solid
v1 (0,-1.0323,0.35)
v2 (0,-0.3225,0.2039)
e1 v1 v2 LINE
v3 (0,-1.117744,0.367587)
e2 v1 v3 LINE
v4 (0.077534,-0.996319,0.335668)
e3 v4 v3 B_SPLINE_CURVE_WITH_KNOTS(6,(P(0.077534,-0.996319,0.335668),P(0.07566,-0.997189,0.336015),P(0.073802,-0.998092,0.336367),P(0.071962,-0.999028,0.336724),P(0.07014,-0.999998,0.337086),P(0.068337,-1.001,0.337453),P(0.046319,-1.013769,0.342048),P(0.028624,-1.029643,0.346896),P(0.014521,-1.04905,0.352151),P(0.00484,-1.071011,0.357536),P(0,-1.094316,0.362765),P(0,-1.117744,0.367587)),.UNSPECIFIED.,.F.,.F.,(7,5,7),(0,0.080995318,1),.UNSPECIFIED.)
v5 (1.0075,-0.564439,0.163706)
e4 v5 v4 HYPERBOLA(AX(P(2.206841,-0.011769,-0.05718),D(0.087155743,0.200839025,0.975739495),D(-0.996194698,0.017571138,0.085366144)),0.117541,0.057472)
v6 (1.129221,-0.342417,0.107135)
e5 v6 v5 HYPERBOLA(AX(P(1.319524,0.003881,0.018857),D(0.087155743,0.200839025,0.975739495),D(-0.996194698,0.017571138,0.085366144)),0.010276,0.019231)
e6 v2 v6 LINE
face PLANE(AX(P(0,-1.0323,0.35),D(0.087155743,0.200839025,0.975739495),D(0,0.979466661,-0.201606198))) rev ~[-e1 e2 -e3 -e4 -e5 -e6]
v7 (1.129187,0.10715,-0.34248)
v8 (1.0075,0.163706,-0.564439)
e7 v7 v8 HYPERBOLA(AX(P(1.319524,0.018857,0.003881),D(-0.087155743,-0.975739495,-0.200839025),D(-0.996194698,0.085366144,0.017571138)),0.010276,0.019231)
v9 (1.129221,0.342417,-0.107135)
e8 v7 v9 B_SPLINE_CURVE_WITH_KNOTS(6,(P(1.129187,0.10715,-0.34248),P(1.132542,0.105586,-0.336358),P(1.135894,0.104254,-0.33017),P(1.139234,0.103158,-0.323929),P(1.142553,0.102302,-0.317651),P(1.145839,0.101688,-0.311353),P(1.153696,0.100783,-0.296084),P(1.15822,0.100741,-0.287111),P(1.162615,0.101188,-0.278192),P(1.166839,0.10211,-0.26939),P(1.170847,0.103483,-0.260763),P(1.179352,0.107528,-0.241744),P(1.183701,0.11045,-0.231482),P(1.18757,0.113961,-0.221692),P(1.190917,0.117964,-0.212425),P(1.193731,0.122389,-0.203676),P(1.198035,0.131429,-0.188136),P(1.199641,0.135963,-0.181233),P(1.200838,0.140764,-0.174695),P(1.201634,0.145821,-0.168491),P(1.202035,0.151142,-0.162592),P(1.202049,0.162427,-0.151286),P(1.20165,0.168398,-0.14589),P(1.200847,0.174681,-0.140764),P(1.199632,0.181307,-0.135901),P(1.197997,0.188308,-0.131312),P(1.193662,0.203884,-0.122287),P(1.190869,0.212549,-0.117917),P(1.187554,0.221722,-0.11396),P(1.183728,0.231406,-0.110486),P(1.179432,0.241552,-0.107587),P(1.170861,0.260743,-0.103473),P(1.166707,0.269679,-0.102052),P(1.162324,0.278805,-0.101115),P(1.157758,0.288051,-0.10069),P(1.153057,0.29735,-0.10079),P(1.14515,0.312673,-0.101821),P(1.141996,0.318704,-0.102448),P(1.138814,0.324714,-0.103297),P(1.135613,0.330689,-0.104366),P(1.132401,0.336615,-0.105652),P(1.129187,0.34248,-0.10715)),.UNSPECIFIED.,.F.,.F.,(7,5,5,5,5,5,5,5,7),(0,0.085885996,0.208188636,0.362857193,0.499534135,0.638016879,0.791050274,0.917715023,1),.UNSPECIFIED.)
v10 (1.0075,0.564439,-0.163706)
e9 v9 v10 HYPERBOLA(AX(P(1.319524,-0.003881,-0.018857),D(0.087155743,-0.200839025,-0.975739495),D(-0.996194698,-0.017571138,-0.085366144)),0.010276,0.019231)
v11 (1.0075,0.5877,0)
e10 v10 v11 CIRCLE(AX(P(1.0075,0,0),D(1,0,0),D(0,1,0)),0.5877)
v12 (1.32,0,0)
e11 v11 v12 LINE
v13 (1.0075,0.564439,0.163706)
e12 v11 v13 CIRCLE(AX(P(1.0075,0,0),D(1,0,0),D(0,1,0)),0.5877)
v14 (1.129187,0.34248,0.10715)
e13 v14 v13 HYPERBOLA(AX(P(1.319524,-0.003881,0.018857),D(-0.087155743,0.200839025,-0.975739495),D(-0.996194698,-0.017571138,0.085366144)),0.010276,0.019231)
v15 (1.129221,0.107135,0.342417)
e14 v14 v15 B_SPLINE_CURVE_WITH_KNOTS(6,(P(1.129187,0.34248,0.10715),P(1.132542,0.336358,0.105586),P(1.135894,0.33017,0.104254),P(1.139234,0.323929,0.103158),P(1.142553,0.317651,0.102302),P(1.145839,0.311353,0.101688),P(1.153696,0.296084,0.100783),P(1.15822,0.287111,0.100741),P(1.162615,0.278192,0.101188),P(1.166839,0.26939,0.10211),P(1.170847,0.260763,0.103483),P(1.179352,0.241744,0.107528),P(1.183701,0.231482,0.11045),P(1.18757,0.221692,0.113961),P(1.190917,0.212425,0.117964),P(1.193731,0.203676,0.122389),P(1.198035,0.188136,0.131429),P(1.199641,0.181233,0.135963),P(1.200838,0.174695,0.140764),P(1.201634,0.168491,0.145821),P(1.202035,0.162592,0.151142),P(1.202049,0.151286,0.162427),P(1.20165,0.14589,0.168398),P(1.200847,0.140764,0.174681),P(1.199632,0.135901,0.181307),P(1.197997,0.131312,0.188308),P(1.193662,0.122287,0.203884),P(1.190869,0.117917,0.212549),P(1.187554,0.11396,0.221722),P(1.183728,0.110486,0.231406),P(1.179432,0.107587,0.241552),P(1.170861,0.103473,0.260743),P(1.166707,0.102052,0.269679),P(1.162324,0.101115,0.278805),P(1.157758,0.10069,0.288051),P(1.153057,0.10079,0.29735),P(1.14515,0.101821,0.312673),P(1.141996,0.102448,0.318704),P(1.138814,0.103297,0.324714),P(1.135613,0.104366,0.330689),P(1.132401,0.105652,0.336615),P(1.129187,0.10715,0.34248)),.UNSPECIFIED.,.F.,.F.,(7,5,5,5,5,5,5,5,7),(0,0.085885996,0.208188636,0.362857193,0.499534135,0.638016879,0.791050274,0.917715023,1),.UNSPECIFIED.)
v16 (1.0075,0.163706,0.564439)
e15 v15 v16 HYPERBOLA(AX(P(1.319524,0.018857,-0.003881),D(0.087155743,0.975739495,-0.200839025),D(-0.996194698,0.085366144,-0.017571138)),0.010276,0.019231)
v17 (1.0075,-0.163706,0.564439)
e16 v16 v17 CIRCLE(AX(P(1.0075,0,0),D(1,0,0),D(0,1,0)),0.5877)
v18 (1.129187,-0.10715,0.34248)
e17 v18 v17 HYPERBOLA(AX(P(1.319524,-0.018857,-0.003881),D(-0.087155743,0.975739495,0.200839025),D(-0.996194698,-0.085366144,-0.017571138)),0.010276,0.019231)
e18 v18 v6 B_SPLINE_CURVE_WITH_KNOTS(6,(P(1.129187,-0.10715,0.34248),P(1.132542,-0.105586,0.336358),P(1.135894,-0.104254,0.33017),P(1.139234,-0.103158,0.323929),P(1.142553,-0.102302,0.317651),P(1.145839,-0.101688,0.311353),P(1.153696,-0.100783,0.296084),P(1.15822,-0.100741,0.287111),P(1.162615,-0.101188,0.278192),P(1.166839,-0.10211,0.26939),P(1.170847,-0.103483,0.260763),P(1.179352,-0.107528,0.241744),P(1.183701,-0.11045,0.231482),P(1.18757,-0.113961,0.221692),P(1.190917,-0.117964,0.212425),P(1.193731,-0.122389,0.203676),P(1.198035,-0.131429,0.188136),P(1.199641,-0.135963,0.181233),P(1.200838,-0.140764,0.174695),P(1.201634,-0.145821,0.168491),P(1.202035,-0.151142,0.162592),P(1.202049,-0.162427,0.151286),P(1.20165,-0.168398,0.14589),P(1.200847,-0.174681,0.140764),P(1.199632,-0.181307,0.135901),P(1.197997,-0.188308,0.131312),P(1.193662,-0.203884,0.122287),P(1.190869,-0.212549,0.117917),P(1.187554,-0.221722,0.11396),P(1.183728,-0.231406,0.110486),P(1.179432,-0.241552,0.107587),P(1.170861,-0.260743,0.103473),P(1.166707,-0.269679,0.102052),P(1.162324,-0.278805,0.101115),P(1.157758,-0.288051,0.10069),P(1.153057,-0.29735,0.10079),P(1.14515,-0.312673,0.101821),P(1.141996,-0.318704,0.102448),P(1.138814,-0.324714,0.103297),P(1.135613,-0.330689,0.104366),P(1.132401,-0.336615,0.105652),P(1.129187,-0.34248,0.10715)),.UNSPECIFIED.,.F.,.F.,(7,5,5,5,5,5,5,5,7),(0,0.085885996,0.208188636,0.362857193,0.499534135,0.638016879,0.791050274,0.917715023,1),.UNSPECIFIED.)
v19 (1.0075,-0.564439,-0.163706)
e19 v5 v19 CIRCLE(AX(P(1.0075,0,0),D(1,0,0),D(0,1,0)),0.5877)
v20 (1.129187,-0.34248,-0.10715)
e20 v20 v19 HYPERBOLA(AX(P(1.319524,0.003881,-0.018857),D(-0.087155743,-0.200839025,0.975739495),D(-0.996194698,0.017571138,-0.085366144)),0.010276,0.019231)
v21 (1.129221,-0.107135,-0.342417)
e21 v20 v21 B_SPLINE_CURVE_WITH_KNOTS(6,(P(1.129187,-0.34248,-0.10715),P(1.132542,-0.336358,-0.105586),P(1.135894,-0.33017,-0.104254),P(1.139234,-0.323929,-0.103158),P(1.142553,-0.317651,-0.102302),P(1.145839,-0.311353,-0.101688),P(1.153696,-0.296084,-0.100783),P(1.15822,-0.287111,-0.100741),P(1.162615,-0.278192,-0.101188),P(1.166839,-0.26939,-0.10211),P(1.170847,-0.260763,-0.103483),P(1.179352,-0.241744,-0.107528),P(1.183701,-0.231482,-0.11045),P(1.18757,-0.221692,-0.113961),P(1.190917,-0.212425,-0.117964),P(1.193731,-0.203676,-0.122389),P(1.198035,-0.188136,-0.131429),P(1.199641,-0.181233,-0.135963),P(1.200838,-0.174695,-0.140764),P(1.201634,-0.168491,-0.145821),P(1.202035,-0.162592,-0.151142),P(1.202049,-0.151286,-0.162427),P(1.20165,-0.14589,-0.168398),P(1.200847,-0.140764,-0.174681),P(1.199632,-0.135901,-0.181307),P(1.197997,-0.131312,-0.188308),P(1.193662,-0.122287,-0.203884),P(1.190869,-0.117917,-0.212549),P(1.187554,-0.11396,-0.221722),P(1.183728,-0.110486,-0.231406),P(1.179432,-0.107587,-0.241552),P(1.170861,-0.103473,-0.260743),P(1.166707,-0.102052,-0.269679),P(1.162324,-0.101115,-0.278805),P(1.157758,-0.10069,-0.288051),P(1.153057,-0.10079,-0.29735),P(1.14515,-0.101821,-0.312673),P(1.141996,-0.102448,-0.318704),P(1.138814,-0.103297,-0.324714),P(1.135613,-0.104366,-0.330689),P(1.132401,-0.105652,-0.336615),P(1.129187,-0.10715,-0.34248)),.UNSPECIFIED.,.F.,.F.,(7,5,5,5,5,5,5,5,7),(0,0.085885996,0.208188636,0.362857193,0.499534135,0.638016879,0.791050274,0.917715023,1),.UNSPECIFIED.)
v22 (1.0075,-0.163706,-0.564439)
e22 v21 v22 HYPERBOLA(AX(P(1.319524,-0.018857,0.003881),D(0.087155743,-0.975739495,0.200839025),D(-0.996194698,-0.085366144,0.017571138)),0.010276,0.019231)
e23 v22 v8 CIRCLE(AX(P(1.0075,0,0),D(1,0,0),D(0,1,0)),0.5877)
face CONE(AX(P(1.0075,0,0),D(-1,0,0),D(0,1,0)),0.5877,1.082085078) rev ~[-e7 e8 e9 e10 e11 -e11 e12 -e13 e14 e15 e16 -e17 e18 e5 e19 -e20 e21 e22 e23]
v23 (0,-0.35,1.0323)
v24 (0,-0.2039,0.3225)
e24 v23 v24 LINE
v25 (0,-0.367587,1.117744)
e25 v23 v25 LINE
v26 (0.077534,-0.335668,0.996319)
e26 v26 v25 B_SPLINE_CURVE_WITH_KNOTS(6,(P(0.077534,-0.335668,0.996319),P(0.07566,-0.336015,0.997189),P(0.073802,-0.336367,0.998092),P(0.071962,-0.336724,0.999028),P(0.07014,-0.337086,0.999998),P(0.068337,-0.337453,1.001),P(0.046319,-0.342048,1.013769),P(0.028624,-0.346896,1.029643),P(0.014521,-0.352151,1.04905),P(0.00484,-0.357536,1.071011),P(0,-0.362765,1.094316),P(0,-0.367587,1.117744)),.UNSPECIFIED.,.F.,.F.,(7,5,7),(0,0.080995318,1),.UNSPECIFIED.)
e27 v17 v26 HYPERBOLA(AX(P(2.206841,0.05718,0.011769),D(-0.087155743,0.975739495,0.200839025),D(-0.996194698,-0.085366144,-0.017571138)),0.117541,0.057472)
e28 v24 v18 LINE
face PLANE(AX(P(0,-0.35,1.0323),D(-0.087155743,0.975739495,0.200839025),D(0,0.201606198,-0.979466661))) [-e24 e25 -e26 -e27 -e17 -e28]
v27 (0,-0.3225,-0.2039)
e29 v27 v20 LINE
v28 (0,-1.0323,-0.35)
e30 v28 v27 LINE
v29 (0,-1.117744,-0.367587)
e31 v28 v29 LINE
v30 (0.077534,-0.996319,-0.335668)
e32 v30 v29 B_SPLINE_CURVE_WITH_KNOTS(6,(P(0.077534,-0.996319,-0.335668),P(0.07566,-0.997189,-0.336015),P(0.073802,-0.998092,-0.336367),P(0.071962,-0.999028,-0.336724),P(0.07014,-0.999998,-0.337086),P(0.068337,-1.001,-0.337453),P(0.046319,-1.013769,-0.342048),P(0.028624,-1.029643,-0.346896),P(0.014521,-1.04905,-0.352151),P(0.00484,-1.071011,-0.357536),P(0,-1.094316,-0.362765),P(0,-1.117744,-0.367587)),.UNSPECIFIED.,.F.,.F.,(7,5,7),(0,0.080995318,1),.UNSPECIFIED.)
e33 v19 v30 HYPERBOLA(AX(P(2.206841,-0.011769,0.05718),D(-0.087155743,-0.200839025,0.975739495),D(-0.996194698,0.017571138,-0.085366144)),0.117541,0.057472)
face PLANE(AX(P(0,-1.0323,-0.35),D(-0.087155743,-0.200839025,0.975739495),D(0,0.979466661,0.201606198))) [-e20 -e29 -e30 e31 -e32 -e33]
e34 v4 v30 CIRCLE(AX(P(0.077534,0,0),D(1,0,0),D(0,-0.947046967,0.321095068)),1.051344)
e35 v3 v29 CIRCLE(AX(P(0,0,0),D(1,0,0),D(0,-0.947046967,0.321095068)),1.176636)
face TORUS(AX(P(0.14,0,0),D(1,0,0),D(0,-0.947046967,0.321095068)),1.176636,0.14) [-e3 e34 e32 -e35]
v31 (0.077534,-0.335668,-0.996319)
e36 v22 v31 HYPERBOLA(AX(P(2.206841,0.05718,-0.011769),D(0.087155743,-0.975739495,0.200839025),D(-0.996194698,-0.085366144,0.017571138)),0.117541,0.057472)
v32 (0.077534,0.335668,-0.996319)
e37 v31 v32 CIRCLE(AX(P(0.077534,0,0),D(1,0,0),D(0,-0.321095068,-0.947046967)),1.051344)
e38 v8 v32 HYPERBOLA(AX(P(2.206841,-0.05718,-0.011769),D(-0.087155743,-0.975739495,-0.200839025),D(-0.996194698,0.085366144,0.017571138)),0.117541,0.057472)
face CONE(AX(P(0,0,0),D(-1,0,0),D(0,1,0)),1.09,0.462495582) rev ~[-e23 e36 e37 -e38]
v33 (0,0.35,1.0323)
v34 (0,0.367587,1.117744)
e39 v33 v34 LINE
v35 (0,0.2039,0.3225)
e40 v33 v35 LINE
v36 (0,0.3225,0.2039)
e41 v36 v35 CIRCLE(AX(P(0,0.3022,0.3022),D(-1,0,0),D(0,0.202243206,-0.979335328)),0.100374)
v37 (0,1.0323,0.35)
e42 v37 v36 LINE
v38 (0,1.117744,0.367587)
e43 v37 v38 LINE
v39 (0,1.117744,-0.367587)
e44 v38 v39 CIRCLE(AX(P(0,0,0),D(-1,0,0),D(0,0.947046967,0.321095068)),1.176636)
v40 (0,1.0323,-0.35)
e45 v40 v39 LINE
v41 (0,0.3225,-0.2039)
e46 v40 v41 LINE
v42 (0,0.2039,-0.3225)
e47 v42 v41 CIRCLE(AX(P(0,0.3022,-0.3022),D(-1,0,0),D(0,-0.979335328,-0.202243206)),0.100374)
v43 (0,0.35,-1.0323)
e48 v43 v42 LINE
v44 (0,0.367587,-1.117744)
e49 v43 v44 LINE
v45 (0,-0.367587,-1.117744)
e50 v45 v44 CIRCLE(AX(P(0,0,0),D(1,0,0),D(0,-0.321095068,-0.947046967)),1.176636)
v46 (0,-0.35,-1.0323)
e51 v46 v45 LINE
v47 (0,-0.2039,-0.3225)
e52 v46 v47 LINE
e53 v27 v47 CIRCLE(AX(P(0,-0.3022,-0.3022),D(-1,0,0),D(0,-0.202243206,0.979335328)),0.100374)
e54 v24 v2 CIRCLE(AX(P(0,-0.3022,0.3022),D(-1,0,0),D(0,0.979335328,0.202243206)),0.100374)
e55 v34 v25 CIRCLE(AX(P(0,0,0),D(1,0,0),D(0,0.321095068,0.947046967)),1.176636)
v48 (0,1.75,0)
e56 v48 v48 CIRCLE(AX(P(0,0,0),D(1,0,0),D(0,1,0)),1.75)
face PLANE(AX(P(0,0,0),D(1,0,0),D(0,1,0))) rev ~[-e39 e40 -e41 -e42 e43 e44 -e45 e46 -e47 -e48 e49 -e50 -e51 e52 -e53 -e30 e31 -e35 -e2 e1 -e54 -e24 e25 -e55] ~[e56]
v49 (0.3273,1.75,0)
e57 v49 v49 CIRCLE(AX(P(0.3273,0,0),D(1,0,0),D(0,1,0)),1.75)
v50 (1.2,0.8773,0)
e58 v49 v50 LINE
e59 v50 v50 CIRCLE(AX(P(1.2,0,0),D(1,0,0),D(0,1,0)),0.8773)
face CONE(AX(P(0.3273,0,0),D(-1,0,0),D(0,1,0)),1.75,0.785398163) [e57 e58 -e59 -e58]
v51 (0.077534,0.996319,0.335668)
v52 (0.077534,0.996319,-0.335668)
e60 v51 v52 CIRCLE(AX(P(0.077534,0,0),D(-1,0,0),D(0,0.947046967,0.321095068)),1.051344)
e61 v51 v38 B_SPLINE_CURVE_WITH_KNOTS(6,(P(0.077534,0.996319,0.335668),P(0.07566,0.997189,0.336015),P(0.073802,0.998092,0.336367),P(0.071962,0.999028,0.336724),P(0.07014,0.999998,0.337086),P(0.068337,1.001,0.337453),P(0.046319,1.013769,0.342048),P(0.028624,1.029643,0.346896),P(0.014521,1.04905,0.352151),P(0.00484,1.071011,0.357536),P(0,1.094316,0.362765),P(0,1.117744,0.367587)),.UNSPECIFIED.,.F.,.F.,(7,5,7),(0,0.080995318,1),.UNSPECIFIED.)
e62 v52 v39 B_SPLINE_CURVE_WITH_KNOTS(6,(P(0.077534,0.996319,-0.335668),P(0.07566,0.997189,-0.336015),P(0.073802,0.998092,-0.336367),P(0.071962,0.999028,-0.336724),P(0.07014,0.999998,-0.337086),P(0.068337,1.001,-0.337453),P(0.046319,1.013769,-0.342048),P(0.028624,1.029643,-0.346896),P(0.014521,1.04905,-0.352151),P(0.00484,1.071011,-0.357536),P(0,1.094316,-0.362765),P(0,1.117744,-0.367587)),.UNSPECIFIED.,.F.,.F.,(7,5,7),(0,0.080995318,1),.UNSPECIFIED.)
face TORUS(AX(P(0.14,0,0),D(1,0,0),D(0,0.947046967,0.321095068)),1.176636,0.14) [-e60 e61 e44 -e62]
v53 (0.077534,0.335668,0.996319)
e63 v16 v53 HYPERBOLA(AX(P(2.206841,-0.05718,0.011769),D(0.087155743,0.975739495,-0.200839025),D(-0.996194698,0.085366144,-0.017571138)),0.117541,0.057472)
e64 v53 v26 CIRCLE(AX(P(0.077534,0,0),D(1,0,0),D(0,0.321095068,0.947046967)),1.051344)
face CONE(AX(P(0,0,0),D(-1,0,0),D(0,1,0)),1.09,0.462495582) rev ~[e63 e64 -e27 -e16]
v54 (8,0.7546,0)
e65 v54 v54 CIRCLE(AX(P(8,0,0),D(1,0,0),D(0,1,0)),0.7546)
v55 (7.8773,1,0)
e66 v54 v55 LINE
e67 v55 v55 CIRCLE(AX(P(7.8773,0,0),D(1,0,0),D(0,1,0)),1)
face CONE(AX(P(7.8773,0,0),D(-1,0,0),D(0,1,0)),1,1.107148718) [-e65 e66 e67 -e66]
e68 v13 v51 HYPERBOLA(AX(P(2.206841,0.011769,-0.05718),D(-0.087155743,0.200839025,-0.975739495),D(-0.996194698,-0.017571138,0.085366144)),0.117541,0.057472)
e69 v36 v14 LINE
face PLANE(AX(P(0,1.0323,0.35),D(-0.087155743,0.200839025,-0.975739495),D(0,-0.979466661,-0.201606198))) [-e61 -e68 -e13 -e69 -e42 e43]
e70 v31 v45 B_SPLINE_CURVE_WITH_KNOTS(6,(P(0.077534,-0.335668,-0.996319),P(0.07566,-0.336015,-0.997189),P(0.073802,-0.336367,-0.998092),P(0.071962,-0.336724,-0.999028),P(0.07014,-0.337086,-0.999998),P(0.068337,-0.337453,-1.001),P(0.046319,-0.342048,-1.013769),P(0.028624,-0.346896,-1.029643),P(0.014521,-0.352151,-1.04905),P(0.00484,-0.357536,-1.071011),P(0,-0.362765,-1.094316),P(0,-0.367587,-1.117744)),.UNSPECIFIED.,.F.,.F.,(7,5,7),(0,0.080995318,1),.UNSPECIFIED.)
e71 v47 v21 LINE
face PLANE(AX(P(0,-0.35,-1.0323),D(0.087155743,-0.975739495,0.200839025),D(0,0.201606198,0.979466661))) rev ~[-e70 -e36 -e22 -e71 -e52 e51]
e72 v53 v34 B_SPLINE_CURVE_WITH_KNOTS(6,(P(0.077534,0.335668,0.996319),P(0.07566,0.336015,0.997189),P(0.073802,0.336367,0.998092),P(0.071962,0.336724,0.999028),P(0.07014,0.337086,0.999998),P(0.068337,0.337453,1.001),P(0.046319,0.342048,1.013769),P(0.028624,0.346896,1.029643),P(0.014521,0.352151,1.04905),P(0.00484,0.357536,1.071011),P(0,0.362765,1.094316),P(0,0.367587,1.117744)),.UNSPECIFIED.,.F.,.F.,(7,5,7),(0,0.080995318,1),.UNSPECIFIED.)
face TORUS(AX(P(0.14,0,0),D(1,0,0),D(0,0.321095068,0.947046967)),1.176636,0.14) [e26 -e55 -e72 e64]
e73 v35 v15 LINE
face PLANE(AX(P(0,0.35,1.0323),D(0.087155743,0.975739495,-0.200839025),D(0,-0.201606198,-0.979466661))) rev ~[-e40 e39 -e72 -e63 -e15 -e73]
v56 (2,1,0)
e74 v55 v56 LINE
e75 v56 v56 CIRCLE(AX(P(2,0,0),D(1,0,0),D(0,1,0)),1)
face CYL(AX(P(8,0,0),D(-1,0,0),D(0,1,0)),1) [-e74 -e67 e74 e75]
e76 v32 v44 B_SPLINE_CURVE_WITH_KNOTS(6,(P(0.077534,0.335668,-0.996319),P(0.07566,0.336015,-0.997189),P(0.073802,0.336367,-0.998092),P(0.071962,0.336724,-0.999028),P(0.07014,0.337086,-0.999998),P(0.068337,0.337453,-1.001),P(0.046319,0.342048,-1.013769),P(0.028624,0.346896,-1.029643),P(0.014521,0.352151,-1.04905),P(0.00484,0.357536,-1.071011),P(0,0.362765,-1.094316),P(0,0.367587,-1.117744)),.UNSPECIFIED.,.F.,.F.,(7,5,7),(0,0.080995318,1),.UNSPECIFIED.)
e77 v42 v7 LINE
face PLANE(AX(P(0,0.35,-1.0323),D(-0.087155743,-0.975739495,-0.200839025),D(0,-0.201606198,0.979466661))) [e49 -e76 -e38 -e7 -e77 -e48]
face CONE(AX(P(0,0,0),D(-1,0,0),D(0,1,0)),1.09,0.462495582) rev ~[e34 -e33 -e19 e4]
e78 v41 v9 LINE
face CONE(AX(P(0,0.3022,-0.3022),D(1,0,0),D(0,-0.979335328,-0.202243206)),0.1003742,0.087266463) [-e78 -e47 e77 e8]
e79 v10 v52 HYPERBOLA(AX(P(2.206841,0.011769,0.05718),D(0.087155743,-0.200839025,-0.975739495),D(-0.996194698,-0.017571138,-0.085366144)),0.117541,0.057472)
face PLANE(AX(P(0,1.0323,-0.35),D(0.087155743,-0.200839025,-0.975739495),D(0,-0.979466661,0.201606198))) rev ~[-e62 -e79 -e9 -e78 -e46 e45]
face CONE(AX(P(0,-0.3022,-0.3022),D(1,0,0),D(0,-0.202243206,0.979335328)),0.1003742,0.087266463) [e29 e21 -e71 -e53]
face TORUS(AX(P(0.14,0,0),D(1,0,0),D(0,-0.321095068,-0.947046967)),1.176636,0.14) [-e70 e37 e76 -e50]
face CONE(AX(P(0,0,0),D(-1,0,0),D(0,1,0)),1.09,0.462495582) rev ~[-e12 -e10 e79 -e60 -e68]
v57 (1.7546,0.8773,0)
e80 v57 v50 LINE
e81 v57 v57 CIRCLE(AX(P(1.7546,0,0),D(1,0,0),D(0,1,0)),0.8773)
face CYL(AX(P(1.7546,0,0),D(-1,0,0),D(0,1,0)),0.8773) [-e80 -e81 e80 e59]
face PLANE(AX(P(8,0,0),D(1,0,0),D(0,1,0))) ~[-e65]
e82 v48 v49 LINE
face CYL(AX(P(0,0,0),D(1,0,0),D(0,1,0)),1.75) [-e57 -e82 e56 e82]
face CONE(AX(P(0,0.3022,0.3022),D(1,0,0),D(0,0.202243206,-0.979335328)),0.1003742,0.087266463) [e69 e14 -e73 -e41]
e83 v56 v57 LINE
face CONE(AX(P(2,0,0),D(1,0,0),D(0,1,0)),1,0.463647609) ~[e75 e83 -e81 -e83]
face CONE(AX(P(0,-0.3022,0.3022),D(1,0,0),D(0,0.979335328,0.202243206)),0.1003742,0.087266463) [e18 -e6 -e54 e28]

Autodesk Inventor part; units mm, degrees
ref_plane "YZ Plane" through (0, 0, 0) normal (1, 0, 0) x (0, 1, 0)
ref_plane "XZ Plane" through (0, 0, 0) normal (0, 1, 0) x (-1, 0, 0)
sketch "Sketch1" plane through (0, 0, 0) normal (0, 0, 1) x (1, 0, 0)
  line L0 (1.32, 0) -> (8, 0)
  line L1 (8, 0) -> (8, 1)
  line L2 (8, 1) -> (2, 1)
  line L3 (2, 1) -> (1.7546, 0.8773)
  line L4 (1.7546, 0.8773) -> (1.2, 0.8773)
  line L5 (0, 1.75) -> (0, 1.09)
  line L6 (0, 1.09) -> (1.0075, 0.5877)
  line L7 (1.0075, 0.5877) -> (1.32, 0)
  line L8 (-1.6, 0) -> (9.6, 0) projected
  line L9 (0, -0.35) -> (0, 2.1) projected
  line L10 (0, 1.75) -> (0.3273, 1.75)
  line L11 (0.3273, 1.75) -> (1.2, 0.8773)
  line L12 (2, 1) -> (1.0773, 1) construction
  dimension "d1" = 6
  dimension "d2" = 2
  dimension "d3" = 1.7546
  dimension "d4" = 2.18
  dimension "d5" = 26.5
  dimension "d6" = 62
  dimension "d7" = 1.32
  dimension "d8" = 0.2454
  dimension "d12" = 3.5
  dimension "d13" = 45
  dimension "d15" = 8
  dimension "d24" = 1.2
revolve "Body" add sketch "Sketch1" angle 360 about axis through (1.32, 0, 0) along (1, 0, 0) contours L7 L6 L5 L10 L11 L4 L3 L2 L1 L0
sketch "Sketch2" plane through (0, 0, 0) normal (-1, 0, 0) x (0, 0, 1)
  line L0 (0, 1.09) -> (0, 0) construction
  line L1 (0, 0) -> (1.09, 0) construction
  arc A0 (0.327, 0) -> (0, 0.327) centre (0, 0) ccw construction
  arc A1 (0.3815, 0) -> (0, 0.3815) centre (0, 0) ccw construction
  arc A2 (1.0323, 0.35) -> (0.35, 1.0323) centre (0, 0) ccw
  line L2 (0, 0) -> (0.7707, 0.7707) construction
  line L3 (0.35, 1.0323) -> (0.2039, 0.3225)
  line L4 (1.0323, 0.35) -> (0.3225, 0.2039)
  arc A3 (0.35, 1.0323) -> (0, 1.09) centre (0, 0) ccw
  arc A4 (1.09, 0) -> (1.0323, 0.35) centre (0, 0) ccw
  line L5 (0, -2.45) -> (0, 2.45) projected
  line L6 (-2.45, 0) -> (2.45, 0) projected
  arc A5 (0.35, -1.0323) -> (1.0323, -0.35) centre (0, 0) ccw
  line L7 (0.35, -1.0323) -> (0.2039, -0.3225)
  line L8 (1.0323, -0.35) -> (0.3225, -0.2039)
  arc A6 (0, -1.09) -> (0.35, -1.0323) centre (0, 0) ccw
  arc A7 (1.0323, -0.35) -> (1.09, 0) centre (0, 0) ccw
  arc A8 (-0.35, 1.0323) -> (-1.0323, 0.35) centre (0, 0) ccw
  line L9 (-0.35, 1.0323) -> (-0.2039, 0.3225)
  line L10 (-1.0323, 0.35) -> (-0.3225, 0.2039)
  arc A9 (0, 1.09) -> (-0.35, 1.0323) centre (0, 0) ccw
  arc A10 (-1.0323, 0.35) -> (-1.09, 0) centre (0, 0) ccw
  arc A11 (-0.35, -1.0323) -> (0, -1.09) centre (0, 0) ccw
  arc A12 (-1.0323, -0.35) -> (-0.35, -1.0323) centre (0, 0) ccw
  arc A13 (-1.09, 0) -> (-1.0323, -0.35) centre (0, 0) ccw
  line L11 (-1.0323, -0.35) -> (-0.3225, -0.2039)
  line L12 (-0.35, -1.0323) -> (-0.2039, -0.3225)
  arc A14 (0.2039, 0.3225) -> (0.3225, 0.2039) centre (0.3022, 0.3022) ccw
  arc A15 (0.3225, -0.2039) -> (0.2039, -0.3225) centre (0.3022, -0.3022) ccw
  arc A16 (-0.3225, 0.2039) -> (-0.2039, 0.3225) centre (-0.3022, 0.3022) ccw
  arc A17 (-0.2039, -0.3225) -> (-0.3225, -0.2039) centre (-0.3022, -0.3022) ccw
  point P0 (0.7707, -0.7707)
  point P1 (-0.7707, 0.7707)
  point P2 (-0.7707, -0.7707)
  dimension "d17" = 0.654
  dimension "d18" = 0.763
  dimension "d19" = 2.18
  dimension "d20" = 45
  dimension "d21" = 0.35
extrude "Slot" add sketch "Sketch2" against normal up to next draft 5 contours L4 A14 L3 A2 | A5 L7 A15 L8 | L9 A16 L10 A8 | A12 L11 A17 L12
fillet "Fillet1" radius 0.14 4 edges at (0, 1.09, 0) (0, 0, -1.09) (0, -1.09, 0) (0, 0, 1.09)
thread "Thread" size "M2x0.4" class "6g" standard "ISO Metric profile" length 6
chamfer "Chamfer1" distance 0.2454 distance2 0.1227 1 edges at (8, -1, 0) measured on face at (8, -0.1182, -0.3117)
ref_plane "Work Plane2" through (3.35, 0, 0) normal (0, 0, -1) x (1, 0, 0)
equation "\"d17\" = 0.3 * SDM"
equation "\"d18\" = 0.35 * SDM"
equation "\"d19\" = SDM"
equation "\"d21\" = 0.5 * SBR"
equation "\"d1\" = GEL"
equation "\"d2\" = GD"
equation "\"d3\" = BDM"
equation "\"d4\" = SDM"
equation "\"d7\" = INTI"
equation "\"d8\" = GAL"
equation "\"d12\" = KOD"
equation "\"d13\" = 0.5 * SEWI"
equation "\"d15\" = NLG"
equation "\"d24\" = KOH"
equation "\"d23\" = 0.2 * SBR"
equation "\"d10\" = GEL"
equation "\"d25\" = -0.5 * SPD + 0.5 * GD"
equation "\"d26\" = 0.5 * GAL"
equation "\"NLG\" = 8"
equation "\"GEL\" = 6"
equation "\"GAL\" = 0.61345 * PTC"
equation "\"SPD\" = NND - 1.2269 * PTC"
equation "\"KOD\" = 3.5"
equation "\"KOH\" = 1.2"
equation "\"SBR\" = 0.7"
equation "\"INTI\" = 1.32"
equation "\"SDM\" = 2.18"
equation "\"GD\" = NND"
equation "\"BDM\" = NND - GAL"
equation "\"SEWI\" = 90deg"
equation "\"d9\" = SDM"
equation "\"GUL\" = 0.61345 * PTC"
equation "\"TOA\" = 30deg"
equation "\"EPV\" = 2.2"
equation "\"THREADDIA\" = 2"
equation "\"RR\" = 0.2"
equation "\"PTC\" = 0.4"
equation "\"NND\" = 2"
equation "\"GD1\" = THREADDIA - 1.2269 * PTC"
properties part number "AS 1427 - M2 x 8" material "Steel, Mild"
